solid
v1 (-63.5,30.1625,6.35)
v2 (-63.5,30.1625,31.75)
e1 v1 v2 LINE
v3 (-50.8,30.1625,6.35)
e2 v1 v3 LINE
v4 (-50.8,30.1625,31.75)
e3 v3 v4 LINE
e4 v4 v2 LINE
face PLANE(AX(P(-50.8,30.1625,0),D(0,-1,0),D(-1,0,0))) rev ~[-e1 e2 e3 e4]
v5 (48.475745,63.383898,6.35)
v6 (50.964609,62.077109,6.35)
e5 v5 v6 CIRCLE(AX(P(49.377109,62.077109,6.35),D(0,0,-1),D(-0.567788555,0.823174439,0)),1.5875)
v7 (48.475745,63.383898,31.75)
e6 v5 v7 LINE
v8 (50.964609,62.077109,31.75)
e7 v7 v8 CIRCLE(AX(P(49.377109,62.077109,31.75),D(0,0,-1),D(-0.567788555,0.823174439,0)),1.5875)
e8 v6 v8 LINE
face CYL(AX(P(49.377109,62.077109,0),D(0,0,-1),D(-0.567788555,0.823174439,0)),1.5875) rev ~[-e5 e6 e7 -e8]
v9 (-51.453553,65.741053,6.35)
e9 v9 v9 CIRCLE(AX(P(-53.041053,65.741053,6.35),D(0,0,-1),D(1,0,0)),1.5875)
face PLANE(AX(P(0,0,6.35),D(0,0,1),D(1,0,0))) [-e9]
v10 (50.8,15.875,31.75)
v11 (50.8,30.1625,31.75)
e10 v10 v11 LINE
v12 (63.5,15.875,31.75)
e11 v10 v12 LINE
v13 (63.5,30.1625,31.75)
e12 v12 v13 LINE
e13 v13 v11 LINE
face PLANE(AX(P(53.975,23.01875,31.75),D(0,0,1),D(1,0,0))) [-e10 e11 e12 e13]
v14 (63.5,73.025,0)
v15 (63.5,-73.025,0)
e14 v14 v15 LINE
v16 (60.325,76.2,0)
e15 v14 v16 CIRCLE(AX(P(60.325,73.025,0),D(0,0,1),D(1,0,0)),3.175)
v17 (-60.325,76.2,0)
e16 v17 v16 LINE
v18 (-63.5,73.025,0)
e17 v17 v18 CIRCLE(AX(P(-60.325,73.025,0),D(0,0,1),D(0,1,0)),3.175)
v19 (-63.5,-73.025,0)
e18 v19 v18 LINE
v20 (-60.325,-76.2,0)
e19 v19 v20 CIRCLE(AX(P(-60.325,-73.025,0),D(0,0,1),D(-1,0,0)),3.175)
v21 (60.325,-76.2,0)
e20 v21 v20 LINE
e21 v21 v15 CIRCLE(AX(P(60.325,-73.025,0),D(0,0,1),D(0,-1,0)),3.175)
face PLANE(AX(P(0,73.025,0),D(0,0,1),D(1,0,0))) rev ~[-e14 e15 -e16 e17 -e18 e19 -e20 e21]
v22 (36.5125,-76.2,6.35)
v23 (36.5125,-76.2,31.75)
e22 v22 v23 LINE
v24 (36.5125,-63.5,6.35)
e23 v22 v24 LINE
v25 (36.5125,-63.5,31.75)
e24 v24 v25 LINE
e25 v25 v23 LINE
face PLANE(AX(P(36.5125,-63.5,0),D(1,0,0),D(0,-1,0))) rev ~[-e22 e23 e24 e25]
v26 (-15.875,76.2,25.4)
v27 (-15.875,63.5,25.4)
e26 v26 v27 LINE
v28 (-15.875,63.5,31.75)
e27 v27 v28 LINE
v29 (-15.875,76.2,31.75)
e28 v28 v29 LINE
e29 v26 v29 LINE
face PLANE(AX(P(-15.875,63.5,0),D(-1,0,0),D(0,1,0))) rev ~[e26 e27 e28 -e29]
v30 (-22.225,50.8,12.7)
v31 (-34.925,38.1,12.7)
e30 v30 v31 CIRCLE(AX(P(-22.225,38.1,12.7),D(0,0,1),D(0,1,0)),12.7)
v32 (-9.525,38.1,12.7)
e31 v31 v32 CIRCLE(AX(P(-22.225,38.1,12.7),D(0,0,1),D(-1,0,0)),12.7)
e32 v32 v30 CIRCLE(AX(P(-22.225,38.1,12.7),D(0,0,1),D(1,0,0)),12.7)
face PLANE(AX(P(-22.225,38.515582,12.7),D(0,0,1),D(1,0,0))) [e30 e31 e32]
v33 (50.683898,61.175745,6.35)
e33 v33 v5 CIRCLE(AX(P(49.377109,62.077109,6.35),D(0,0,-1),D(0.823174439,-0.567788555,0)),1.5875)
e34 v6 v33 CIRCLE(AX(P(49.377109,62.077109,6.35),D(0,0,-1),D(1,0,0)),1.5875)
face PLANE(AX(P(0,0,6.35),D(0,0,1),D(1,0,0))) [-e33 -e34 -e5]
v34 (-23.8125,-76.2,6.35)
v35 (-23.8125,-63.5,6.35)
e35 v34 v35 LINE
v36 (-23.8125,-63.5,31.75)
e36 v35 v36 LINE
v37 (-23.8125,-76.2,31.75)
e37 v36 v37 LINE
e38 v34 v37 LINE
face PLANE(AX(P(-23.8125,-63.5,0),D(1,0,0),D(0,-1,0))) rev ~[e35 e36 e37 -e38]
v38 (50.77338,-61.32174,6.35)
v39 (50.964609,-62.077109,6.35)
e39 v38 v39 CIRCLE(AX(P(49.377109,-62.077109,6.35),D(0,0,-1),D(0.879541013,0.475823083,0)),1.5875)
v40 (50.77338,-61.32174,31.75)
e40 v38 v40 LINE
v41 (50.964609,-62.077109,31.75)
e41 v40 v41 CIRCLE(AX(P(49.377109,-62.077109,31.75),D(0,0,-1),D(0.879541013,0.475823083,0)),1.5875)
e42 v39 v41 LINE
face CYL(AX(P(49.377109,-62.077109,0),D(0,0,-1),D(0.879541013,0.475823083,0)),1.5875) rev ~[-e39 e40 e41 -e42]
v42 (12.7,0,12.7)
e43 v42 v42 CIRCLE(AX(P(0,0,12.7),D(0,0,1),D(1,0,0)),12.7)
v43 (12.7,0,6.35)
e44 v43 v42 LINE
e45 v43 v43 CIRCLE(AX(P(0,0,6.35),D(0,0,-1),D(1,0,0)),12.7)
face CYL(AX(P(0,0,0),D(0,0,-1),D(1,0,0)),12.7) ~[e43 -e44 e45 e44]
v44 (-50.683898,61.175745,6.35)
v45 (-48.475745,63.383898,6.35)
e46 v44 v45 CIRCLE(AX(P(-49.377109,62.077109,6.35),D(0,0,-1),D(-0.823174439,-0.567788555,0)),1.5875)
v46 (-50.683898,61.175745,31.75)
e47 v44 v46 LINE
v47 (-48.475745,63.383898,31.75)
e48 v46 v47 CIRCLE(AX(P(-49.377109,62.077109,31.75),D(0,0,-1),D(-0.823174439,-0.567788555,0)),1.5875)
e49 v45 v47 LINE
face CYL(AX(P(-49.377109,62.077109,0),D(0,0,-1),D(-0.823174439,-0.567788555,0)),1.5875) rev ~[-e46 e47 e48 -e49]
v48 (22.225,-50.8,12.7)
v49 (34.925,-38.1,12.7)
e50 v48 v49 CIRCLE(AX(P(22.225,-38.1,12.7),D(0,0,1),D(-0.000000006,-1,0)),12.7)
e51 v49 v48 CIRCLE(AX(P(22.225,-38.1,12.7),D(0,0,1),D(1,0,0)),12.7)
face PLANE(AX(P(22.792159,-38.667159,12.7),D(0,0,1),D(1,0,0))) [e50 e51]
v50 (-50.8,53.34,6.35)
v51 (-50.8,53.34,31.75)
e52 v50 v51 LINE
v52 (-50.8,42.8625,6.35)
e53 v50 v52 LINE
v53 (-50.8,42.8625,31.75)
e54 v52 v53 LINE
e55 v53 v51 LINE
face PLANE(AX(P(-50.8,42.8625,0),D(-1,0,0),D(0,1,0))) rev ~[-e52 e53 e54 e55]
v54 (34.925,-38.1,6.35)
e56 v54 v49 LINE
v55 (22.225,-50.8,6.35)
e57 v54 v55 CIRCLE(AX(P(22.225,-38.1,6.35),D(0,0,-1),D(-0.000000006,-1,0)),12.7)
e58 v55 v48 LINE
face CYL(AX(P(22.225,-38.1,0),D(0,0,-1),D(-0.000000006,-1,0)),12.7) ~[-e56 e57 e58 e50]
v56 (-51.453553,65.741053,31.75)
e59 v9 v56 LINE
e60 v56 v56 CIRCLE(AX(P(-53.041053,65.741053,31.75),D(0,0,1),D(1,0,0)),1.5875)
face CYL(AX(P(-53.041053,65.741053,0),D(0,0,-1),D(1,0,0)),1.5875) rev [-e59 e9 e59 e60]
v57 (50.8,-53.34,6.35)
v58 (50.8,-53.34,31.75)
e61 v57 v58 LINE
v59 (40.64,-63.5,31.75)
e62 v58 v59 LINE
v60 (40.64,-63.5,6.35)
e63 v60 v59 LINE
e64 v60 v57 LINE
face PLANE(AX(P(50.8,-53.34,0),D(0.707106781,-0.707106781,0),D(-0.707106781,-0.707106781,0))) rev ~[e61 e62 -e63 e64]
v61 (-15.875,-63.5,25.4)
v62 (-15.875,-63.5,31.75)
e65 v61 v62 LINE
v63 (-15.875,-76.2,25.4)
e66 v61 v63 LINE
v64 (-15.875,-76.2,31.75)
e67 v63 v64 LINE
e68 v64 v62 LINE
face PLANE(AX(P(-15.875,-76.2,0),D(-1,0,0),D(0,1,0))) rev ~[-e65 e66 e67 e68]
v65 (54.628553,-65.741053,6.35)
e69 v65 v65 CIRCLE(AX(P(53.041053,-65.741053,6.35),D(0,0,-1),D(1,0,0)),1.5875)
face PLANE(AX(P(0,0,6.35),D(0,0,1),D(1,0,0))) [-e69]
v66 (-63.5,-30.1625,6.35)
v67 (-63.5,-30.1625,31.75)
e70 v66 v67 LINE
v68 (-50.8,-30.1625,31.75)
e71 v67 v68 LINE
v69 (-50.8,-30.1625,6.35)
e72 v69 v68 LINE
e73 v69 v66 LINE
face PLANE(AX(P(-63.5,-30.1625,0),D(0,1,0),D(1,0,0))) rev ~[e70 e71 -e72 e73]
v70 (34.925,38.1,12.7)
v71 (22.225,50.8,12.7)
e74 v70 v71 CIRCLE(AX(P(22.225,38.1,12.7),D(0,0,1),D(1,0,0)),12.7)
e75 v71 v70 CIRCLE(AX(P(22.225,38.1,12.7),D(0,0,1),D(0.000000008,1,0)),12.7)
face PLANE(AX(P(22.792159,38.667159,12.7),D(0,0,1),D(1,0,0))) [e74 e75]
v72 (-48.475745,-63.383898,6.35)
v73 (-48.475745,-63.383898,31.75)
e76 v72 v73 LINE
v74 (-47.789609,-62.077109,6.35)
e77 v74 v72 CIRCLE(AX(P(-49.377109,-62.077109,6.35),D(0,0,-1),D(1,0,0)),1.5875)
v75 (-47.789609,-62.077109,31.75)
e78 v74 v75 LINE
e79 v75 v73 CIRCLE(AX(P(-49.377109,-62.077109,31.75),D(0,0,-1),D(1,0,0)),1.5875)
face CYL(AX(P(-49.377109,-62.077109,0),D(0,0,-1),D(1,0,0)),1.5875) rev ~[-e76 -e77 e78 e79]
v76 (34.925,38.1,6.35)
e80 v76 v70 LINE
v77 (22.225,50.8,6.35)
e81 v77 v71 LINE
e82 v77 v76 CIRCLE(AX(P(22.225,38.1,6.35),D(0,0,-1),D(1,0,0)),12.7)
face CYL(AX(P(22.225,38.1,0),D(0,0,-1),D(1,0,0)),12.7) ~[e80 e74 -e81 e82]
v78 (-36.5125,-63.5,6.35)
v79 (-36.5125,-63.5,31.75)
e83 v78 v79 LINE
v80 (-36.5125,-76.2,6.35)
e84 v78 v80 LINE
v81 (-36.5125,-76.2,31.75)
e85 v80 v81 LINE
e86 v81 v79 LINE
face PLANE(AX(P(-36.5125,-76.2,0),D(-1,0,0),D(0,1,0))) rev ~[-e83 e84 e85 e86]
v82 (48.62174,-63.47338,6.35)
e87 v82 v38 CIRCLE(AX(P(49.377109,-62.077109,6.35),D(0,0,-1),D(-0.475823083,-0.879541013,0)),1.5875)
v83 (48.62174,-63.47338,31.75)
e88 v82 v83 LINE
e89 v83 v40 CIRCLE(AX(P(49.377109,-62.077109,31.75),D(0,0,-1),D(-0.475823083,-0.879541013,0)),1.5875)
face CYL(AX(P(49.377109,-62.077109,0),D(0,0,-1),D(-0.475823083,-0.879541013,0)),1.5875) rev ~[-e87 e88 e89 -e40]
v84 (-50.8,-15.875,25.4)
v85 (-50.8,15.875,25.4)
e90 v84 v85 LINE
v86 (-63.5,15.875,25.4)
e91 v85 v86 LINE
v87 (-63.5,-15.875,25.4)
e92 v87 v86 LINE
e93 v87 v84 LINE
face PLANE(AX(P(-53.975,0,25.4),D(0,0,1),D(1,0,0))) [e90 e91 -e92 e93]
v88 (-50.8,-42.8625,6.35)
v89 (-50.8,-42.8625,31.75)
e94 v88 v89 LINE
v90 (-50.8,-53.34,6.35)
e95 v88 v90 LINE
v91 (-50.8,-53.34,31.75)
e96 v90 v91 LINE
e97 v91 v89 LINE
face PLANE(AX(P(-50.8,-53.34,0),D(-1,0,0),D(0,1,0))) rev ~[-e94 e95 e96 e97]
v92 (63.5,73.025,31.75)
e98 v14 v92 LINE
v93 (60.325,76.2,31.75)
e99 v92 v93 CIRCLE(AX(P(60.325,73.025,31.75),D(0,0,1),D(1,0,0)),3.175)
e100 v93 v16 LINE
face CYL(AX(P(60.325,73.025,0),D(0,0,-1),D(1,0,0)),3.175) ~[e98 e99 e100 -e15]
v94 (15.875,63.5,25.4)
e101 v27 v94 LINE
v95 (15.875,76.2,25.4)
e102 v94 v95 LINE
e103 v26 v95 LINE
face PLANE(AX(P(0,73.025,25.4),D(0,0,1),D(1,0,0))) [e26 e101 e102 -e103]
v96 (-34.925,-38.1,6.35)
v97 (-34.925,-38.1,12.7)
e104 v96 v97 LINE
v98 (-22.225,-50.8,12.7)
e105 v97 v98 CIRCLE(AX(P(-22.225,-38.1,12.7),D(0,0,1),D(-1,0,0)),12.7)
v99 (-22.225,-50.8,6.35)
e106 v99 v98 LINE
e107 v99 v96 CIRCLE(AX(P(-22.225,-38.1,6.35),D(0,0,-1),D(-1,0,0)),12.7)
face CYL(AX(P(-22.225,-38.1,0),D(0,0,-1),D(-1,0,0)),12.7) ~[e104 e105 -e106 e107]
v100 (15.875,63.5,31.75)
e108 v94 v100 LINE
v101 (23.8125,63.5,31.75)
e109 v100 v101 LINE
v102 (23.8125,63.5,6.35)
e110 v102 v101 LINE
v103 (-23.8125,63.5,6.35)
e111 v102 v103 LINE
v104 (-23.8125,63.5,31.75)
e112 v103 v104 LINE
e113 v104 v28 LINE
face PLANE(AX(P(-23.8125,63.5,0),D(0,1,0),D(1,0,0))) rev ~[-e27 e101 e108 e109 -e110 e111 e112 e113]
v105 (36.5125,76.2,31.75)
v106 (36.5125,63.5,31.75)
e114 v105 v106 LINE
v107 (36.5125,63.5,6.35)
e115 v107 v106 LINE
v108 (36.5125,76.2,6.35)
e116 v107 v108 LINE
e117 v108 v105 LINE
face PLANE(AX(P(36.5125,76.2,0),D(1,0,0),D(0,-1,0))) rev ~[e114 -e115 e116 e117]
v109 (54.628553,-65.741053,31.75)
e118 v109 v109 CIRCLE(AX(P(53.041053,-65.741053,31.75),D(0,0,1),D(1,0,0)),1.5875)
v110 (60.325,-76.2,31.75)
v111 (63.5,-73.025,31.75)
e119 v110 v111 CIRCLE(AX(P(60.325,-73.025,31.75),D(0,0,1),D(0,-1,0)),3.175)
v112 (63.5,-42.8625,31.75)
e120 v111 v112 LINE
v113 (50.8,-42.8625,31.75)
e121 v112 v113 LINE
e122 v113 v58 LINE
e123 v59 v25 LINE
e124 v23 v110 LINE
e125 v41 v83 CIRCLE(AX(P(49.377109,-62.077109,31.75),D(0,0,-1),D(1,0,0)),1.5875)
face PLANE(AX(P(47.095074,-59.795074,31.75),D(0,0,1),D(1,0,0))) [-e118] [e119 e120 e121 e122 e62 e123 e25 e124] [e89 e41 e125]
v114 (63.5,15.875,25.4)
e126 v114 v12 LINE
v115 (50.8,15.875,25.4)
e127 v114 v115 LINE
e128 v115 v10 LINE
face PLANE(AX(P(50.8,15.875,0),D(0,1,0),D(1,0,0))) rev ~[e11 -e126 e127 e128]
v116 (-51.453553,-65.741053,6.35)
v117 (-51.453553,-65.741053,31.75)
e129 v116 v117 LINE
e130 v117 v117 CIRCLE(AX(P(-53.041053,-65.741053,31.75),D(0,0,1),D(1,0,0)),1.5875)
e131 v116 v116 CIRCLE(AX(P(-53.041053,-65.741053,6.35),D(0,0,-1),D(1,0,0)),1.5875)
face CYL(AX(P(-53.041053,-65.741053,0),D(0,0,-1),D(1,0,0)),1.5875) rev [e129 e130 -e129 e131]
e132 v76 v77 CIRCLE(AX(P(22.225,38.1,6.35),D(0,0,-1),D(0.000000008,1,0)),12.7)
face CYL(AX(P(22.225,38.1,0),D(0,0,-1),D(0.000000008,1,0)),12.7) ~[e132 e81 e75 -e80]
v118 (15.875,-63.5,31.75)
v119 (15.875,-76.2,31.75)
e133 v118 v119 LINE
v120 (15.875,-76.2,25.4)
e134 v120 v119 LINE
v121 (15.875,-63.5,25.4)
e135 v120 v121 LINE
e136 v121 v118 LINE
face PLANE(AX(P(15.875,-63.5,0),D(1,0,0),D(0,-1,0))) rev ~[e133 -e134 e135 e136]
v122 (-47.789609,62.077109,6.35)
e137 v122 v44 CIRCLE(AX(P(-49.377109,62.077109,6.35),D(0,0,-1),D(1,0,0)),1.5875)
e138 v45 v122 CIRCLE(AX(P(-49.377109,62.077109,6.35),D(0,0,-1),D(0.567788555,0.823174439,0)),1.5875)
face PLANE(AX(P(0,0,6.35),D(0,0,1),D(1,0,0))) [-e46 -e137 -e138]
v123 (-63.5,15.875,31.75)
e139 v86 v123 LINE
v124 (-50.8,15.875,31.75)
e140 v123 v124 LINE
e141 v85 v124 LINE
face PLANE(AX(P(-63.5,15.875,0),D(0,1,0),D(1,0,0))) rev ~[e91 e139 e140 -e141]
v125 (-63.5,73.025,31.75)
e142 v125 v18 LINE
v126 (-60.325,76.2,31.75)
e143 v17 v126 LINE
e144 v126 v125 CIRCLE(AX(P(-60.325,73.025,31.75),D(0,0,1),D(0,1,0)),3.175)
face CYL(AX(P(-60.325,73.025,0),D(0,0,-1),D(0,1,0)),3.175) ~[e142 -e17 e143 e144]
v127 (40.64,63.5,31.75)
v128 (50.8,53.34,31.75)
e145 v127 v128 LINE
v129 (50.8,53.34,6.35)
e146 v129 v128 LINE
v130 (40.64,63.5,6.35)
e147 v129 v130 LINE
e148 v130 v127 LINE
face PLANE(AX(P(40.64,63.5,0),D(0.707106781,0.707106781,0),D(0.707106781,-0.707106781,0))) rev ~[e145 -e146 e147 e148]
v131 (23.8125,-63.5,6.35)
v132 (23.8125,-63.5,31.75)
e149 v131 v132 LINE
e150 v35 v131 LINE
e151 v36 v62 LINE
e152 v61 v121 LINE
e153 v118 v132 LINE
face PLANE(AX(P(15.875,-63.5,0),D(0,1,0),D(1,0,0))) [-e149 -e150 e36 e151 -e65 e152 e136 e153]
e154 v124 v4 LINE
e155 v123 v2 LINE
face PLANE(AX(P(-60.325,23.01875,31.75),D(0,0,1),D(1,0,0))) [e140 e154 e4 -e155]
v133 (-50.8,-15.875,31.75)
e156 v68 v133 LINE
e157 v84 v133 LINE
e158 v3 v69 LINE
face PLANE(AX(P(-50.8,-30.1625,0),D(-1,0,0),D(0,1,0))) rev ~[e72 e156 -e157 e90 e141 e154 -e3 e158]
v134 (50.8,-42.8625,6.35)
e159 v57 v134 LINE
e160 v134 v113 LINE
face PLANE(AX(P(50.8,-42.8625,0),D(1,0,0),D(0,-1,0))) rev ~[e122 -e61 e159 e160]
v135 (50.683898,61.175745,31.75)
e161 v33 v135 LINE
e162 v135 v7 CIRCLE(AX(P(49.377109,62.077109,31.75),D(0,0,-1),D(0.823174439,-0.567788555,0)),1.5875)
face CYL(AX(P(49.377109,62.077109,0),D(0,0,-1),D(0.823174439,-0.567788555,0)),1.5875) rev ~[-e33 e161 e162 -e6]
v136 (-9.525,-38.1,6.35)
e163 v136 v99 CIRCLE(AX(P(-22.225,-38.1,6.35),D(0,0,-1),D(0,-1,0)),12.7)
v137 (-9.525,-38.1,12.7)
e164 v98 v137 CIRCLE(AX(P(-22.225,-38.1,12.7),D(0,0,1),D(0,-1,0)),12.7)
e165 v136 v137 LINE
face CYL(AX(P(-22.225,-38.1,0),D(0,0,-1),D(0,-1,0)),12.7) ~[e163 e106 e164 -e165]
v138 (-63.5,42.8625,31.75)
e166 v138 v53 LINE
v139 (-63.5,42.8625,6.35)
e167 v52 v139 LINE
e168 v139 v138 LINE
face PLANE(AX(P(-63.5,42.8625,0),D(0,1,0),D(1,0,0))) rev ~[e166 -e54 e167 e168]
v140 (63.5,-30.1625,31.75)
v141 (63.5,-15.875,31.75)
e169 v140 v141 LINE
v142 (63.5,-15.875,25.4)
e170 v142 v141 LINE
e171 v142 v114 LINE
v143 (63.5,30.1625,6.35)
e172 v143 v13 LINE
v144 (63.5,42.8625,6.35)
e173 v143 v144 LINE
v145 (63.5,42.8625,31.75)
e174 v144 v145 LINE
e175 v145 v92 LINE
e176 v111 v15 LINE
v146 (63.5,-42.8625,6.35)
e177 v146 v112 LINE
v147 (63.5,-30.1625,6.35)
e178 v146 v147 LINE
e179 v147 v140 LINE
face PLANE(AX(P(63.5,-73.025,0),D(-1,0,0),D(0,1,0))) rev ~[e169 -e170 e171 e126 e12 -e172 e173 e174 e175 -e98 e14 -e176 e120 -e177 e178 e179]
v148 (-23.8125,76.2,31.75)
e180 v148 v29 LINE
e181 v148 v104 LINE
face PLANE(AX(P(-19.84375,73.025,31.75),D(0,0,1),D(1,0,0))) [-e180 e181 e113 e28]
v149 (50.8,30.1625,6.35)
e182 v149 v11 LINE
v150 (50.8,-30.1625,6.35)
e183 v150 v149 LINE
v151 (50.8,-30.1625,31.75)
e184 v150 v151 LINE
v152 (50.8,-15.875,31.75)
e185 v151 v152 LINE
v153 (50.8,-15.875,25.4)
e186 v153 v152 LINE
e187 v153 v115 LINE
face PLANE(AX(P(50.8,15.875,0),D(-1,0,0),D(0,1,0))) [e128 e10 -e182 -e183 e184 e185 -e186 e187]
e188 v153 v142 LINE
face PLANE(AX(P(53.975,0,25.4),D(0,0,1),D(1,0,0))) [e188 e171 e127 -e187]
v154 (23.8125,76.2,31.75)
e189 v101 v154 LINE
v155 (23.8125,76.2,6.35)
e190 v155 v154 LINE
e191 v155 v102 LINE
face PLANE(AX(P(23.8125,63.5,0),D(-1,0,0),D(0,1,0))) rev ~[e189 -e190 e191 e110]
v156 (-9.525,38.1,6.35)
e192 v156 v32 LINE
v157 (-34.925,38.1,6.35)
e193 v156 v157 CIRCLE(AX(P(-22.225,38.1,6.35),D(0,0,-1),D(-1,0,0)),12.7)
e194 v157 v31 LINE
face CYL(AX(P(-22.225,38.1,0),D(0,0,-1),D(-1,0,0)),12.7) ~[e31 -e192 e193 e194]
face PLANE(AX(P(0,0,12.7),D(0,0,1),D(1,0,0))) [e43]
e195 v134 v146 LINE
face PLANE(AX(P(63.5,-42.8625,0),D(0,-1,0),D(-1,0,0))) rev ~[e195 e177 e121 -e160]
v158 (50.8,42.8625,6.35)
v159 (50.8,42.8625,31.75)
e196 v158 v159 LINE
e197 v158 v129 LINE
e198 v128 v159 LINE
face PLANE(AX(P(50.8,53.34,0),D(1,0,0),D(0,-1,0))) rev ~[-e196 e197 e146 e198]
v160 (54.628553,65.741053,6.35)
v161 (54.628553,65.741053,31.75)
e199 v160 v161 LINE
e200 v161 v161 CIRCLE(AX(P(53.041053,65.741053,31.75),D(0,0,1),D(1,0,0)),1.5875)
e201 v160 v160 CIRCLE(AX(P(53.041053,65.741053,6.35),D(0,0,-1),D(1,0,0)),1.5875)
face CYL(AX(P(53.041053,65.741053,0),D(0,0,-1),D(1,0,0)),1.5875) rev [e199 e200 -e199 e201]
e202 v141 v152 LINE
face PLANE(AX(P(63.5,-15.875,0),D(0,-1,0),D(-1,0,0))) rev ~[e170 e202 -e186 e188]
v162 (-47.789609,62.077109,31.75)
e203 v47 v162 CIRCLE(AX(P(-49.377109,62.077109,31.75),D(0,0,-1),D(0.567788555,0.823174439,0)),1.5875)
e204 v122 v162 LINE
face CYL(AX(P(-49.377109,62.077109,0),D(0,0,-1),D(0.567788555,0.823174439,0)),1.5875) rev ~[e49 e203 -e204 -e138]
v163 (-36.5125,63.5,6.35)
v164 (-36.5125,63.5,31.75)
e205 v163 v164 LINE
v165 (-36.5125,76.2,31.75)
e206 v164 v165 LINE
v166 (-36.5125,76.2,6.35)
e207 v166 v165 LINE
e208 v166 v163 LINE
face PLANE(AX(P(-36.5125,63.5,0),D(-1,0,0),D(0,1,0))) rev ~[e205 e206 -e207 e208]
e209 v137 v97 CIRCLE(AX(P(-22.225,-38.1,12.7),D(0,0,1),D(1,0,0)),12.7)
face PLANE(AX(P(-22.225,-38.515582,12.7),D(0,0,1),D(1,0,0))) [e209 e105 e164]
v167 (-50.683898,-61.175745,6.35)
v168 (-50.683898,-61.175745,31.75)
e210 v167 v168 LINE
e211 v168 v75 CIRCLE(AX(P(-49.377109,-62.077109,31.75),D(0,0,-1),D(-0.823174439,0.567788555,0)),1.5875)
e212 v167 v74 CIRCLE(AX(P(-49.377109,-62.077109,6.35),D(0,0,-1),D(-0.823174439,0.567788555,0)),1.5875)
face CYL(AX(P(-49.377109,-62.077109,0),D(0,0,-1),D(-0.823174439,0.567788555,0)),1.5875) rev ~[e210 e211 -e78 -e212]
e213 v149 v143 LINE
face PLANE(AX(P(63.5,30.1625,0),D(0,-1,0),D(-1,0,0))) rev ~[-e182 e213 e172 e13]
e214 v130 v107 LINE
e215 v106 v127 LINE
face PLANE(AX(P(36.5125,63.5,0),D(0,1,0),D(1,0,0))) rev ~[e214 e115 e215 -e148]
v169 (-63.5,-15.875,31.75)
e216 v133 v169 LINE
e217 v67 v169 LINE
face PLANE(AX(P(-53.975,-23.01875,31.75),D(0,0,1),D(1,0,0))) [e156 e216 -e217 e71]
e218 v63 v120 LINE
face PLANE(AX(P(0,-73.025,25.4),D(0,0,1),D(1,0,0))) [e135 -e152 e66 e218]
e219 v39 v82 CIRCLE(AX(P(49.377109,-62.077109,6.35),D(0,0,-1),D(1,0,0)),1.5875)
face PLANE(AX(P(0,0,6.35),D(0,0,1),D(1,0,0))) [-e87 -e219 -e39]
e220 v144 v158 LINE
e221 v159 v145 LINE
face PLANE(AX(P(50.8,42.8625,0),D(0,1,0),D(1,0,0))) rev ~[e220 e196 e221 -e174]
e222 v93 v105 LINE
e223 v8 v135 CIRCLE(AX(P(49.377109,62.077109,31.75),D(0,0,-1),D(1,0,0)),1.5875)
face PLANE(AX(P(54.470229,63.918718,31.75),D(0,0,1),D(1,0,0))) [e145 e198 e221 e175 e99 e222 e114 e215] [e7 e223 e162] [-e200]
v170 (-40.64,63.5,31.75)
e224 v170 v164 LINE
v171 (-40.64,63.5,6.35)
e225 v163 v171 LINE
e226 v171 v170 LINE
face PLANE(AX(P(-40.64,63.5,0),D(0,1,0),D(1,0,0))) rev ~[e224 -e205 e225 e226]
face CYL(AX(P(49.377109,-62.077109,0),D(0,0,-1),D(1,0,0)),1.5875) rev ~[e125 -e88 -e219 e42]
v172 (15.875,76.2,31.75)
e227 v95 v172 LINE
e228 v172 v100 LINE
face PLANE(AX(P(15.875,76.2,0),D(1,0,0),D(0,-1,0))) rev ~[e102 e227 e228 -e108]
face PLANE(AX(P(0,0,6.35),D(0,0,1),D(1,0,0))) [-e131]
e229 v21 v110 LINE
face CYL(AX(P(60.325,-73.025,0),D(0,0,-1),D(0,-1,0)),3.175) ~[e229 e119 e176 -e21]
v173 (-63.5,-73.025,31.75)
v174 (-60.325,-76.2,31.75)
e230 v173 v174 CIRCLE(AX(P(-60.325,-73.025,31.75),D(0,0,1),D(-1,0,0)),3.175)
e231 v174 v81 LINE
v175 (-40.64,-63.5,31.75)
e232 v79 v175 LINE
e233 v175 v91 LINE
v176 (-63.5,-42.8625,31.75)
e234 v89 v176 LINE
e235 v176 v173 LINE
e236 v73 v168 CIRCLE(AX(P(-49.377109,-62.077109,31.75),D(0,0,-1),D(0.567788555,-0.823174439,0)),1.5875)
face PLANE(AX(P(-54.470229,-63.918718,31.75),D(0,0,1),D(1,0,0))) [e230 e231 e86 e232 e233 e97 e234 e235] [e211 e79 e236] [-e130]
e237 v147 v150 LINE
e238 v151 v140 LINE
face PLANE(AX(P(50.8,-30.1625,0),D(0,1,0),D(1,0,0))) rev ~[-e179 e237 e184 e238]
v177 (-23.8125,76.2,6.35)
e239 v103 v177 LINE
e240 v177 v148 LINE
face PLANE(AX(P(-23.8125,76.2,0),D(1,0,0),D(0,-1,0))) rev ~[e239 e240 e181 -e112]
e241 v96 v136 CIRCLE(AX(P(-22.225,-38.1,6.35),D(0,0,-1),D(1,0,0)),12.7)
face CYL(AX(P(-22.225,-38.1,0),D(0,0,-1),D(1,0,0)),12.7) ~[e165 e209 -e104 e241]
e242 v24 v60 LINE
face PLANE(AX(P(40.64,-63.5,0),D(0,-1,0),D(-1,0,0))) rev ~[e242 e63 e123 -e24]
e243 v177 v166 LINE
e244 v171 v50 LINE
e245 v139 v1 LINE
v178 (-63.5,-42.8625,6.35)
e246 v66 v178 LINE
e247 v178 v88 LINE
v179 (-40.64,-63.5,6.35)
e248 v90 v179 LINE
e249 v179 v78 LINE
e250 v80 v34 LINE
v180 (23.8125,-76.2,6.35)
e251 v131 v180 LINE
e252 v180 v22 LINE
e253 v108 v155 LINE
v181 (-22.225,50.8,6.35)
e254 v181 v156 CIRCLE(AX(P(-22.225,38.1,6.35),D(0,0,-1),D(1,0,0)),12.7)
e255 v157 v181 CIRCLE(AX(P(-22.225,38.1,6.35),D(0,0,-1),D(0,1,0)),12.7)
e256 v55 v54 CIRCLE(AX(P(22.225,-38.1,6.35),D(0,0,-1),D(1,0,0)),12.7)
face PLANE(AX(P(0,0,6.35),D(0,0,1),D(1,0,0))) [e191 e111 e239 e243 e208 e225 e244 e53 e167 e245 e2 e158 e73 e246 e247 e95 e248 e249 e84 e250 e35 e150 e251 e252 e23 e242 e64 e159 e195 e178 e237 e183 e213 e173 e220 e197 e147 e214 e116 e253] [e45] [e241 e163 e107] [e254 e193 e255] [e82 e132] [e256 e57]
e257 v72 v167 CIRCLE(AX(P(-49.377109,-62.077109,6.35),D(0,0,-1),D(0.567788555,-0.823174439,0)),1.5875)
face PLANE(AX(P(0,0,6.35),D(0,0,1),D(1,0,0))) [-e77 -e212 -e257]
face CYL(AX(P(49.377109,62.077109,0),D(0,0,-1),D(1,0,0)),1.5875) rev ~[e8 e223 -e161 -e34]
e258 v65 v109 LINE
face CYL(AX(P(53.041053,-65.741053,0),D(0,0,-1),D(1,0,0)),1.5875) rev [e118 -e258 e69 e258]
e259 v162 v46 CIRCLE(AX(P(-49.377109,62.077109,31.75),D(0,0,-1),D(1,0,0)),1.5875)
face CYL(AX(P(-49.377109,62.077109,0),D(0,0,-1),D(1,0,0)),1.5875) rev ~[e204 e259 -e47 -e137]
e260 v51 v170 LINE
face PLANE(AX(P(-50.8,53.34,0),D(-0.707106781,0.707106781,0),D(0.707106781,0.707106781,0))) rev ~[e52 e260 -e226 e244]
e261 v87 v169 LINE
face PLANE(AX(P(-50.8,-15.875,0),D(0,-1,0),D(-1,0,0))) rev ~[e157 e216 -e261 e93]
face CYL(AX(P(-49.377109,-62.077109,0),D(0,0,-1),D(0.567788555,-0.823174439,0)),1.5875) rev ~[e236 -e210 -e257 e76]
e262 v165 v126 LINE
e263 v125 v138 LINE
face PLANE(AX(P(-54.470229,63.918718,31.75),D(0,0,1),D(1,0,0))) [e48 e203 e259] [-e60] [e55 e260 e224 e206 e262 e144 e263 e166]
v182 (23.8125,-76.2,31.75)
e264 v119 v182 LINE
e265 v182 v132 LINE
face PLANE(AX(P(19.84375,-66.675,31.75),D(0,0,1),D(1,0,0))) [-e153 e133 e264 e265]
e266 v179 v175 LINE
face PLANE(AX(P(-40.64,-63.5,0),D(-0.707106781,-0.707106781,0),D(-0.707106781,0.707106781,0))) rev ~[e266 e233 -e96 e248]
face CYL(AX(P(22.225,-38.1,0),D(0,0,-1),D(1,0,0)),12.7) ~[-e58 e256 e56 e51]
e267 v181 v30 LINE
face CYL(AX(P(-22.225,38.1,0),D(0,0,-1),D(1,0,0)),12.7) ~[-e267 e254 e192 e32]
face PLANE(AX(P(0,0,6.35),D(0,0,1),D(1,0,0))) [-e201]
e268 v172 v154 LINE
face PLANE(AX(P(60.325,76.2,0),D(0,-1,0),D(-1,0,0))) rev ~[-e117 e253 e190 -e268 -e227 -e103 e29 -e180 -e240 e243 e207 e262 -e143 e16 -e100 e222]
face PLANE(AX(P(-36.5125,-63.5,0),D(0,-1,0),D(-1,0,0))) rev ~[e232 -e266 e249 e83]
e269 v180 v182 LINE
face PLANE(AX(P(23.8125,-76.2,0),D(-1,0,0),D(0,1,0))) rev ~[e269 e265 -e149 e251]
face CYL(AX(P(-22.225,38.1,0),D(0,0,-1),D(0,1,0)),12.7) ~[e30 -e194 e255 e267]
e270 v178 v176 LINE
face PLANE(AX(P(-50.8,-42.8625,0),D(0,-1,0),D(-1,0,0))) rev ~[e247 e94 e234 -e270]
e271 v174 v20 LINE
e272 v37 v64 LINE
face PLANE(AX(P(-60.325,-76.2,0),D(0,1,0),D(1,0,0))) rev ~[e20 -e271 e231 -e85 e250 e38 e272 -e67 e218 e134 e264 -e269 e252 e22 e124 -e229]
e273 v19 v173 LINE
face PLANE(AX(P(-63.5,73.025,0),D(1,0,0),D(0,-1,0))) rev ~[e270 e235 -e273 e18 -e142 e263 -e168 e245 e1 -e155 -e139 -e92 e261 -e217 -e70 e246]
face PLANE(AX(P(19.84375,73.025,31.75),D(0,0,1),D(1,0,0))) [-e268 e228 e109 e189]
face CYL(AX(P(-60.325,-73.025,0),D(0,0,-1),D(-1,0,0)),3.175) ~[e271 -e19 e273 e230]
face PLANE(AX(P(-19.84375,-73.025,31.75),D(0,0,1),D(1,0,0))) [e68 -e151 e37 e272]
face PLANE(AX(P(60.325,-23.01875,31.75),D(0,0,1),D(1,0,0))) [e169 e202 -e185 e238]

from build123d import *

# Parameters (mm, degrees)
F0_R     = 12.7
F0_R_2   = 1.5875
F0_W     = 6.35
F0_H     = 31.75
F0_W_2   = 31.75
F0_H_2   = 6.35
F0_H_3   = 14.2875
F0_H_4   = 12.7
F0_W_3   = 12.7
F0_W_4   = 7.9375
F1_DEPTH = 6.35
F2_DEPTH = 12.7
F3_DEPTH = 31.75
F4_DEPTH = 25.4


# Not quite as in the source:
# - a feature names something its author has since deleted; it is built from what else it names


with BuildPart() as f1:
    # F0 (on Top) → F1 (new body)
    with BuildSketch(Plane.XY):
        Polygon((-23.8125, 63.5), (-36.5125, 63.5), (-40.64, 63.5), (-50.8, 53.34), (-50.8, 42.8625), (-50.8, 30.1625), (-50.8, 15.875), (-50.8, -15.875), (-50.8, -30.1625), (-50.8, -42.8625), (-50.8, -53.34), (-40.64, -63.5), (-36.5125, -63.5), (-23.8125, -63.5), (-15.875, -63.5), (15.875, -63.5), (23.8125, -63.5), (36.5125, -63.5), (40.64, -63.5), (50.8, -53.34), (50.8, -42.8625), (50.8, -30.1625), (50.8, -15.875), (50.8, 15.875), (50.8, 30.1625), (50.8, 42.8625), (50.8, 53.34), (40.64, 63.5), (36.5125, 63.5), (23.8125, 63.5), (15.875, 63.5), (-15.875, 63.5), align=None)
        Polygon((-34.925, 38.1), (-34.925, 50.8), (-22.225, 50.8), (22.2250000973, 50.8), (34.925, 50.8), (34.925, 38.1), (34.925, -38.1), (34.925, -50.8), (22.2249999213, -50.8), (-22.225, -50.8), (-34.925, -50.8), (-34.925, -38.1), align=None, mode=Mode.SUBTRACT)
        with BuildLine():
            Line((22.2250000973, 50.8), (-22.225, 50.8))
            ThreePointArc((-22.225, 50.8), (-13.2447438789, 47.0802561211), (-9.525, 38.1))
            ThreePointArc((-9.525, 38.1), (-22.225, 25.4), (-34.925, 38.1))
            Line((-34.925, 38.1), (-34.925, -38.1))
            ThreePointArc((-34.925, -38.1), (-22.225, -25.4), (-9.525, -38.1))
            ThreePointArc((-9.525, -38.1), (-13.2447438789, -47.0802561211), (-22.225, -50.8))
            Line((-22.225, -50.8), (22.2249999213, -50.8))
            ThreePointArc((22.2249999213, -50.8), (13.2447439068, -29.1197438511), (34.925, -38.1))
            Line((34.925, -38.1), (34.925, 38.1))
            ThreePointArc((34.925, 38.1), (13.2447438445, 29.1197439133), (22.2250000973, 50.8))
        make_face()
        Circle(F0_R, mode=Mode.SUBTRACT)
        with BuildLine():
            ThreePointArc((34.925, 38.1), (31.2052561555, 47.0802560867), (22.2250000973, 50.8))
            ThreePointArc((22.2250000973, 50.8), (13.2447438445, 29.1197439133), (34.925, 38.1))
        make_face()
        Circle(F0_R)
        with BuildLine():
            ThreePointArc((-9.525, -38.1), (-22.225, -25.4), (-34.925, -38.1))
            ThreePointArc((-34.925, -38.1), (-31.2052561211, -47.0802561211), (-22.225, -50.8))
            ThreePointArc((-22.225, -50.8), (-13.2447438789, -47.0802561211), (-9.525, -38.1))
        make_face()
        with BuildLine():
            ThreePointArc((22.2249999213, -50.8), (31.2052560932, -47.0802561489), (34.925, -38.1))
            ThreePointArc((34.925, -38.1), (13.2447439068, -29.1197438511), (22.2249999213, -50.8))
        make_face()
        with BuildLine():
            ThreePointArc((-9.525, 38.1), (-13.2447438789, 47.0802561211), (-22.225, 50.8))
            ThreePointArc((-22.225, 50.8), (-31.2052561211, 47.0802561211), (-34.925, 38.1))
            ThreePointArc((-34.925, 38.1), (-22.225, 25.4), (-9.525, 38.1))
        make_face()
        with BuildLine():
            Line((-57.15, -42.8625), (-63.5, -42.8625))
            Line((-63.5, -42.8625), (-63.5, -73.025))
            ThreePointArc((-63.5, -73.025), (-62.5700640303, -75.2700640303), (-60.325, -76.2))
            Line((-60.325, -76.2), (-36.5125, -76.2))
            Line((-36.5125, -76.2), (-36.5125, -69.85))
            Line((-36.5125, -69.85), (-53.975, -69.85))
            ThreePointArc((-53.975, -69.85), (-56.2200640303, -68.9200640303), (-57.15, -66.675))
            Line((-57.15, -66.675), (-57.15, -42.8625))
        make_face()
        with BuildLine():
            Line((-36.5125, 76.2), (-60.325, 76.2))
            ThreePointArc((-60.325, 76.2), (-62.5700640303, 75.2700640303), (-63.5, 73.025))
            Line((-63.5, 73.025), (-63.5, 42.8625))
            Line((-63.5, 42.8625), (-57.15, 42.8625))
            Line((-57.15, 42.8625), (-57.15, 66.675))
            ThreePointArc((-57.15, 66.675), (-56.2200640303, 68.9200640303), (-53.975, 69.85))
            Line((-53.975, 69.85), (-36.5125, 69.85))
            Line((-36.5125, 69.85), (-36.5125, 76.2))
        make_face()
        with BuildLine():
            Line((60.325, 76.2), (36.5125, 76.2))
            Line((36.5125, 76.2), (36.5125, 69.85))
            Line((36.5125, 69.85), (53.975, 69.85))
            ThreePointArc((53.975, 69.85), (56.2200640303, 68.9200640303), (57.15, 66.675))
            Line((57.15, 66.675), (57.15, 42.8625))
            Line((57.15, 42.8625), (63.5, 42.8625))
            Line((63.5, 42.8625), (63.5, 73.025))
            ThreePointArc((63.5, 73.025), (62.5700640303, 75.2700640303), (60.325, 76.2))
        make_face()
        with BuildLine():
            Line((63.5, -73.025), (63.5, -42.8625))
            Line((63.5, -42.8625), (57.15, -42.8625))
            Line((57.15, -42.8625), (57.15, -66.675))
            ThreePointArc((57.15, -66.675), (56.2200640303, -68.9200640303), (53.975, -69.85))
            Line((53.975, -69.85), (36.5125, -69.85))
            Line((36.5125, -69.85), (36.5125, -76.2))
            Line((36.5125, -76.2), (60.325, -76.2))
            ThreePointArc((60.325, -76.2), (62.5700640303, -75.2700640303), (63.5, -73.025))
        make_face()
        with BuildLine():
            Line((-50.8, -42.8625), (-57.15, -42.8625))
            Line((-57.15, -42.8625), (-57.15, -66.675))
            ThreePointArc((-57.15, -66.675), (-56.2200640303, -68.9200640303), (-53.975, -69.85))
            Line((-53.975, -69.85), (-36.5125, -69.85))
            Line((-36.5125, -69.85), (-36.5125, -63.5))
            Line((-36.5125, -63.5), (-40.64, -63.5))
            Line((-40.64, -63.5), (-47.625, -63.5))
            ThreePointArc((-47.625, -63.5), (-48.054315115, -63.4708406718), (-48.4757445352, -63.3838982879))
            ThreePointArc((-48.4757445352, -63.3838982879), (-50.4996408811, -63.1996408811), (-50.6838982879, -61.1757445352))
            ThreePointArc((-50.6838982879, -61.1757445352), (-50.7708406718, -60.754315115), (-50.8, -60.325))
            Line((-50.8, -60.325), (-50.8, -53.34))
            Line((-50.8, -53.34), (-50.8, -42.8625))
        make_face()
        with Locations((-53.0410533634, -65.7410533634)):
            Circle(F0_R_2, mode=Mode.SUBTRACT)
        with BuildLine():
            Line((53.975, 69.85), (36.5125, 69.85))
            Line((36.5125, 69.85), (36.5125, 63.5))
            Line((36.5125, 63.5), (40.64, 63.5))
            Line((40.64, 63.5), (47.625, 63.5))
            ThreePointArc((47.625, 63.5), (48.054315115, 63.4708406718), (48.4757445352, 63.3838982879))
            ThreePointArc((48.4757445352, 63.3838982879), (50.1150927327, 63.4826465078), (50.964608866, 62.077108866))
            ThreePointArc((50.964608866, 62.077108866), (50.8928074603, 61.6050770648), (50.6838982879, 61.1757445352))
            ThreePointArc((50.6838982879, 61.1757445352), (50.7708406718, 60.754315115), (50.8, 60.325))
            Line((50.8, 60.325), (50.8, 53.34))
            Line((50.8, 53.34), (50.8, 42.8625))
            Line((50.8, 42.8625), (57.15, 42.8625))
            Line((57.15, 42.8625), (57.15, 66.675))
            ThreePointArc((57.15, 66.675), (56.2200640303, 68.9200640303), (53.975, 69.85))
        make_face()
        with Locations((53.0410533634, 65.7410533634)):
            Circle(F0_R_2, mode=Mode.SUBTRACT)
        with BuildLine():
            Line((-36.5125, 63.5), (-36.5125, 69.85))
            Line((-36.5125, 69.85), (-53.975, 69.85))
            ThreePointArc((-53.975, 69.85), (-56.2200640303, 68.9200640303), (-57.15, 66.675))
            Line((-57.15, 66.675), (-57.15, 42.8625))
            Line((-57.15, 42.8625), (-50.8, 42.8625))
            Line((-50.8, 42.8625), (-50.8, 53.34))
            Line((-50.8, 53.34), (-50.8, 60.325))
            ThreePointArc((-50.8, 60.325), (-50.7708406718, 60.754315115), (-50.6838982879, 61.1757445352))
            ThreePointArc((-50.6838982879, 61.1757445352), (-50.4996408811, 63.1996408811), (-48.4757445352, 63.3838982879))
            ThreePointArc((-48.4757445352, 63.3838982879), (-48.054315115, 63.4708406718), (-47.625, 63.5))
            Line((-47.625, 63.5), (-40.64, 63.5))
            Line((-40.64, 63.5), (-36.5125, 63.5))
        make_face()
        with Locations((-53.0410533634, 65.7410533634)):
            Circle(F0_R_2, mode=Mode.SUBTRACT)
        with BuildLine():
            Line((57.15, -66.675), (57.15, -42.8625))
            Line((57.15, -42.8625), (50.8, -42.8625))
            Line((50.8, -42.8625), (50.8, -53.34))
            Line((50.8, -53.34), (50.8, -60.9545768509))
            ThreePointArc((50.8, -60.9545768509), (50.7933363337, -61.1386401459), (50.7733802244, -61.3217397219))
            ThreePointArc((50.7733802244, -61.3217397219), (50.9160593252, -61.6875094123), (50.964608866, -62.077108866))
            ThreePointArc((50.964608866, -62.077108866), (50.1898227559, -63.4407995872), (48.6217397219, -63.4733802244))
            ThreePointArc((48.6217397219, -63.4733802244), (48.4386401459, -63.4933363337), (48.2545768509, -63.5))
            Line((48.2545768509, -63.5), (40.64, -63.5))
            Line((40.64, -63.5), (36.5125, -63.5))
            Line((36.5125, -63.5), (36.5125, -69.85))
            Line((36.5125, -69.85), (53.975, -69.85))
            ThreePointArc((53.975, -69.85), (56.2200640303, -68.9200640303), (57.15, -66.675))
        make_face()
        with Locations((53.0410533634, -65.7410533634)):
            Circle(F0_R_2, mode=Mode.SUBTRACT)
        with Locations((-60.325, 0)):
            Rectangle(F0_W, F0_H)
        with Locations((0, -73.025)):
            Rectangle(F0_W_2, F0_H_2)
        with Locations((0, 66.675)):
            Rectangle(F0_W_2, F0_H_2)
        with Locations((0, 73.025)):
            Rectangle(F0_W_2, F0_H_2)
        with Locations((-53.975, 0)):
            Rectangle(F0_W, F0_H)
        with Locations((53.975, 0)):
            Rectangle(F0_W, F0_H)
        with Locations((0, -66.675)):
            Rectangle(F0_W_2, F0_H_2)
        with Locations((60.325, 0)):
            Rectangle(F0_W, F0_H)
        with Locations((60.325, -23.01875)):
            Rectangle(F0_W, F0_H_3)
        with Locations((-53.975, -23.01875)):
            Rectangle(F0_W, F0_H_3)
        with Locations((-53.975, 23.01875)):
            Rectangle(F0_W, F0_H_3)
        with Locations((53.975, -23.01875)):
            Rectangle(F0_W, F0_H_3)
        with Locations((53.975, 23.01875)):
            Rectangle(F0_W, F0_H_3)
        with Locations((-60.325, -23.01875)):
            Rectangle(F0_W, F0_H_3)
        with Locations((60.325, 23.01875)):
            Rectangle(F0_W, F0_H_3)
        with Locations((-60.325, 23.01875)):
            Rectangle(F0_W, F0_H_3)
        with Locations((-60.325, -36.5125)):
            Rectangle(F0_W, F0_H_4)
        with Locations((53.975, 36.5125)):
            Rectangle(F0_W, F0_H_4)
        with Locations((30.1625, 73.025)):
            Rectangle(F0_W_3, F0_H_2)
        with Locations((60.325, -36.5125)):
            Rectangle(F0_W, F0_H_4)
        with Locations((60.325, 36.5125)):
            Rectangle(F0_W, F0_H_4)
        with Locations((-60.325, 36.5125)):
            Rectangle(F0_W, F0_H_4)
        with Locations((-30.1625, -73.025)):
            Rectangle(F0_W_3, F0_H_2)
        with Locations((30.1625, -66.675)):
            Rectangle(F0_W_3, F0_H_2)
        with Locations((30.1625, -73.025)):
            Rectangle(F0_W_3, F0_H_2)
        with Locations((-30.1625, 73.025)):
            Rectangle(F0_W_3, F0_H_2)
        with Locations((-30.1625, -66.675)):
            Rectangle(F0_W_3, F0_H_2)
        with Locations((-53.975, -36.5125)):
            Rectangle(F0_W, F0_H_4)
        with Locations((-53.975, 36.5125)):
            Rectangle(F0_W, F0_H_4)
        with Locations((-30.1625, 66.675)):
            Rectangle(F0_W_3, F0_H_2)
        with Locations((53.975, -36.5125)):
            Rectangle(F0_W, F0_H_4)
        with Locations((30.1625, 66.675)):
            Rectangle(F0_W_3, F0_H_2)
        with Locations((19.84375, -66.675)):
            Rectangle(F0_W_4, F0_H_2)
        with Locations((-19.84375, -66.675)):
            Rectangle(F0_W_4, F0_H_2)
        with Locations((19.84375, 73.025)):
            Rectangle(F0_W_4, F0_H_2)
        with Locations((-19.84375, 73.025)):
            Rectangle(F0_W_4, F0_H_2)
        with Locations((-19.84375, 66.675)):
            Rectangle(F0_W_4, F0_H_2)
        with Locations((-19.84375, -73.025)):
            Rectangle(F0_W_4, F0_H_2)
        with Locations((19.84375, -73.025)):
            Rectangle(F0_W_4, F0_H_2)
        with Locations((19.84375, 66.675)):
            Rectangle(F0_W_4, F0_H_2)
        with BuildLine():
            Line((50.8, -60.9545768509), (50.8, -53.34))
            Line((50.8, -53.34), (40.64, -63.5))
            Line((40.64, -63.5), (48.2545768509, -63.5))
            ThreePointArc((48.2545768509, -63.5), (48.4386401459, -63.4933363337), (48.6217397219, -63.4733802244))
            ThreePointArc((48.6217397219, -63.4733802244), (48.2545768509, -60.9545768509), (50.7733802244, -61.3217397219))
            ThreePointArc((50.7733802244, -61.3217397219), (50.7933363337, -61.1386401459), (50.8, -60.9545768509))
        make_face()
        with BuildLine():
            Line((-50.8, 53.34), (-40.64, 63.5))
            Line((-40.64, 63.5), (-47.625, 63.5))
            ThreePointArc((-47.625, 63.5), (-48.054315115, 63.4708406718), (-48.4757445352, 63.3838982879))
            ThreePointArc((-48.4757445352, 63.3838982879), (-47.9715712242, 62.8150927327), (-47.789608866, 62.077108866))
            ThreePointArc((-47.789608866, 62.077108866), (-48.9050770648, 60.5614102718), (-50.6838982879, 61.1757445352))
            ThreePointArc((-50.6838982879, 61.1757445352), (-50.7708406718, 60.754315115), (-50.8, 60.325))
            Line((-50.8, 60.325), (-50.8, 53.34))
        make_face()
        with BuildLine():
            Line((-40.64, -63.5), (-50.8, -53.34))
            Line((-50.8, -53.34), (-50.8, -60.325))
            ThreePointArc((-50.8, -60.325), (-50.7708406718, -60.754315115), (-50.6838982879, -61.1757445352))
            ThreePointArc((-50.6838982879, -61.1757445352), (-48.9050770648, -60.5614102718), (-47.789608866, -62.077108866))
            ThreePointArc((-47.789608866, -62.077108866), (-47.9715712242, -62.8150927327), (-48.4757445352, -63.3838982879))
            ThreePointArc((-48.4757445352, -63.3838982879), (-48.054315115, -63.4708406718), (-47.625, -63.5))
            Line((-47.625, -63.5), (-40.64, -63.5))
        make_face()
        with BuildLine():
            Line((47.625, 63.5), (40.64, 63.5))
            Line((40.64, 63.5), (50.8, 53.34))
            Line((50.8, 53.34), (50.8, 60.325))
            ThreePointArc((50.8, 60.325), (50.7708406718, 60.754315115), (50.6838982879, 61.1757445352))
            ThreePointArc((50.6838982879, 61.1757445352), (48.2545768509, 60.9545768509), (48.4757445352, 63.3838982879))
            ThreePointArc((48.4757445352, 63.3838982879), (48.054315115, 63.4708406718), (47.625, 63.5))
        make_face()
        with BuildLine():
            Line((34.925, 50.8), (22.2250000973, 50.8))
            ThreePointArc((22.2250000973, 50.8), (31.2052561555, 47.0802560867), (34.925, 38.1))
            Line((34.925, 38.1), (34.925, 50.8))
        make_face()
        with BuildLine():
            Line((34.925, -50.8), (34.925, -38.1))
            ThreePointArc((34.925, -38.1), (31.2052560932, -47.0802561489), (22.2249999213, -50.8))
            Line((22.2249999213, -50.8), (34.925, -50.8))
        make_face()
        with BuildLine():
            ThreePointArc((-22.225, -50.8), (-31.2052561211, -47.0802561211), (-34.925, -38.1))
            Line((-34.925, -38.1), (-34.925, -50.8))
            Line((-34.925, -50.8), (-22.225, -50.8))
        make_face()
        with BuildLine():
            Line((-22.225, 50.8), (-34.925, 50.8))
            Line((-34.925, 50.8), (-34.925, 38.1))
            ThreePointArc((-34.925, 38.1), (-31.2052561211, 47.0802561211), (-22.225, 50.8))
        make_face()
        with Locations((-53.0410533634, 65.7410533634)):
            Circle(F0_R_2)
        with Locations((53.0410533634, 65.7410533634)):
            Circle(F0_R_2)
        with Locations((53.0410533634, -65.7410533634)):
            Circle(F0_R_2)
        with Locations((-53.0410533634, -65.7410533634)):
            Circle(F0_R_2)
        with BuildLine():
            ThreePointArc((48.6217397219, -63.4733802244), (50.0544628206, -62.7544628206), (50.7733802244, -61.3217397219))
            ThreePointArc((50.7733802244, -61.3217397219), (48.2545768509, -60.9545768509), (48.6217397219, -63.4733802244))
        make_face()
        with BuildLine():
            ThreePointArc((-47.789608866, 62.077108866), (-47.9715712242, 62.8150927327), (-48.4757445352, 63.3838982879))
            ThreePointArc((-48.4757445352, 63.3838982879), (-49.8700640303, 62.5700640303), (-50.6838982879, 61.1757445352))
            ThreePointArc((-50.6838982879, 61.1757445352), (-48.9050770648, 60.5614102718), (-47.789608866, 62.077108866))
        make_face()
        with BuildLine():
            ThreePointArc((50.6838982879, 61.1757445352), (49.8700640303, 62.5700640303), (48.4757445352, 63.3838982879))
            ThreePointArc((48.4757445352, 63.3838982879), (48.2545768509, 60.9545768509), (50.6838982879, 61.1757445352))
        make_face()
        with BuildLine():
            ThreePointArc((-47.789608866, -62.077108866), (-48.9050770648, -60.5614102718), (-50.6838982879, -61.1757445352))
            ThreePointArc((-50.6838982879, -61.1757445352), (-49.8700640303, -62.5700640303), (-48.4757445352, -63.3838982879))
            ThreePointArc((-48.4757445352, -63.3838982879), (-47.9715712242, -62.8150927327), (-47.789608866, -62.077108866))
        make_face()
        with BuildLine():
            ThreePointArc((50.964608866, 62.077108866), (50.1150927327, 63.4826465078), (48.4757445352, 63.3838982879))
            ThreePointArc((48.4757445352, 63.3838982879), (49.8700640303, 62.5700640303), (50.6838982879, 61.1757445352))
            ThreePointArc((50.6838982879, 61.1757445352), (50.8928074603, 61.6050770648), (50.964608866, 62.077108866))
        make_face()
        with BuildLine():
            ThreePointArc((-50.6838982879, 61.1757445352), (-49.8700640303, 62.5700640303), (-48.4757445352, 63.3838982879))
            ThreePointArc((-48.4757445352, 63.3838982879), (-50.4996408811, 63.1996408811), (-50.6838982879, 61.1757445352))
        make_face()
        with BuildLine():
            ThreePointArc((-48.4757445352, -63.3838982879), (-49.8700640303, -62.5700640303), (-50.6838982879, -61.1757445352))
            ThreePointArc((-50.6838982879, -61.1757445352), (-50.4996408811, -63.1996408811), (-48.4757445352, -63.3838982879))
        make_face()
        with BuildLine():
            ThreePointArc((50.964608866, -62.077108866), (50.9160593252, -61.6875094123), (50.7733802244, -61.3217397219))
            ThreePointArc((50.7733802244, -61.3217397219), (50.0544628206, -62.7544628206), (48.6217397219, -63.4733802244))
            ThreePointArc((48.6217397219, -63.4733802244), (50.1898227559, -63.4407995872), (50.964608866, -62.077108866))
        make_face()
    extrude(amount=F1_DEPTH)

    # F0 (on Top) → F2 (join)
    with BuildSketch(Plane.XY):
        with BuildLine():
            ThreePointArc((-9.525, 38.1), (-13.2447438789, 47.0802561211), (-22.225, 50.8))
            ThreePointArc((-22.225, 50.8), (-31.2052561211, 47.0802561211), (-34.925, 38.1))
            ThreePointArc((-34.925, 38.1), (-22.225, 25.4), (-9.525, 38.1))
        make_face()
        with BuildLine():
            ThreePointArc((34.925, 38.1), (31.2052561555, 47.0802560867), (22.2250000973, 50.8))
            ThreePointArc((22.2250000973, 50.8), (13.2447438445, 29.1197439133), (34.925, 38.1))
        make_face()
        Circle(F0_R)
        with BuildLine():
            ThreePointArc((-9.525, -38.1), (-22.225, -25.4), (-34.925, -38.1))
            ThreePointArc((-34.925, -38.1), (-31.2052561211, -47.0802561211), (-22.225, -50.8))
            ThreePointArc((-22.225, -50.8), (-13.2447438789, -47.0802561211), (-9.525, -38.1))
        make_face()
        with BuildLine():
            ThreePointArc((22.2249999213, -50.8), (31.2052560932, -47.0802561489), (34.925, -38.1))
            ThreePointArc((34.925, -38.1), (13.2447439068, -29.1197438511), (22.2249999213, -50.8))
        make_face()
    extrude(amount=F2_DEPTH)

    # F0 (on Top) → F3 (join)
    with BuildSketch(Plane.XY):
        with BuildLine():
            Line((-36.5125, 76.2), (-60.325, 76.2))
            ThreePointArc((-60.325, 76.2), (-62.5700640303, 75.2700640303), (-63.5, 73.025))
            Line((-63.5, 73.025), (-63.5, 42.8625))
            Line((-63.5, 42.8625), (-57.15, 42.8625))
            Line((-57.15, 42.8625), (-57.15, 66.675))
            ThreePointArc((-57.15, 66.675), (-56.2200640303, 68.9200640303), (-53.975, 69.85))
            Line((-53.975, 69.85), (-36.5125, 69.85))
            Line((-36.5125, 69.85), (-36.5125, 76.2))
        make_face()
        with BuildLine():
            Line((-36.5125, 63.5), (-36.5125, 69.85))
            Line((-36.5125, 69.85), (-53.975, 69.85))
            ThreePointArc((-53.975, 69.85), (-56.2200640303, 68.9200640303), (-57.15, 66.675))
            Line((-57.15, 66.675), (-57.15, 42.8625))
            Line((-57.15, 42.8625), (-50.8, 42.8625))
            Line((-50.8, 42.8625), (-50.8, 53.34))
            Line((-50.8, 53.34), (-50.8, 60.325))
            ThreePointArc((-50.8, 60.325), (-50.7708406718, 60.754315115), (-50.6838982879, 61.1757445352))
            ThreePointArc((-50.6838982879, 61.1757445352), (-50.4996408811, 63.1996408811), (-48.4757445352, 63.3838982879))
            ThreePointArc((-48.4757445352, 63.3838982879), (-48.054315115, 63.4708406718), (-47.625, 63.5))
            Line((-47.625, 63.5), (-40.64, 63.5))
            Line((-40.64, 63.5), (-36.5125, 63.5))
        make_face()
        with Locations((-53.0410533634, 65.7410533634)):
            Circle(F0_R_2, mode=Mode.SUBTRACT)
        with Locations((-19.84375, 73.025)):
            Rectangle(F0_W_4, F0_H_2)
        with Locations((-19.84375, 66.675)):
            Rectangle(F0_W_4, F0_H_2)
        with BuildLine():
            Line((-50.8, 53.34), (-40.64, 63.5))
            Line((-40.64, 63.5), (-47.625, 63.5))
            ThreePointArc((-47.625, 63.5), (-48.054315115, 63.4708406718), (-48.4757445352, 63.3838982879))
            ThreePointArc((-48.4757445352, 63.3838982879), (-47.9715712242, 62.8150927327), (-47.789608866, 62.077108866))
            ThreePointArc((-47.789608866, 62.077108866), (-48.9050770648, 60.5614102718), (-50.6838982879, 61.1757445352))
            ThreePointArc((-50.6838982879, 61.1757445352), (-50.7708406718, 60.754315115), (-50.8, 60.325))
            Line((-50.8, 60.325), (-50.8, 53.34))
        make_face()
        with Locations((19.84375, 73.025)):
            Rectangle(F0_W_4, F0_H_2)
        with Locations((19.84375, 66.675)):
            Rectangle(F0_W_4, F0_H_2)
        with BuildLine():
            Line((60.325, 76.2), (36.5125, 76.2))
            Line((36.5125, 76.2), (36.5125, 69.85))
            Line((36.5125, 69.85), (53.975, 69.85))
            ThreePointArc((53.975, 69.85), (56.2200640303, 68.9200640303), (57.15, 66.675))
            Line((57.15, 66.675), (57.15, 42.8625))
            Line((57.15, 42.8625), (63.5, 42.8625))
            Line((63.5, 42.8625), (63.5, 73.025))
            ThreePointArc((63.5, 73.025), (62.5700640303, 75.2700640303), (60.325, 76.2))
        make_face()
        with BuildLine():
            Line((53.975, 69.85), (36.5125, 69.85))
            Line((36.5125, 69.85), (36.5125, 63.5))
            Line((36.5125, 63.5), (40.64, 63.5))
            Line((40.64, 63.5), (47.625, 63.5))
            ThreePointArc((47.625, 63.5), (48.054315115, 63.4708406718), (48.4757445352, 63.3838982879))
            ThreePointArc((48.4757445352, 63.3838982879), (50.1150927327, 63.4826465078), (50.964608866, 62.077108866))
            ThreePointArc((50.964608866, 62.077108866), (50.8928074603, 61.6050770648), (50.6838982879, 61.1757445352))
            ThreePointArc((50.6838982879, 61.1757445352), (50.7708406718, 60.754315115), (50.8, 60.325))
            Line((50.8, 60.325), (50.8, 53.34))
            Line((50.8, 53.34), (50.8, 42.8625))
            Line((50.8, 42.8625), (57.15, 42.8625))
            Line((57.15, 42.8625), (57.15, 66.675))
            ThreePointArc((57.15, 66.675), (56.2200640303, 68.9200640303), (53.975, 69.85))
        make_face()
        with Locations((53.0410533634, 65.7410533634)):
            Circle(F0_R_2, mode=Mode.SUBTRACT)
        with BuildLine():
            Line((47.625, 63.5), (40.64, 63.5))
            Line((40.64, 63.5), (50.8, 53.34))
            Line((50.8, 53.34), (50.8, 60.325))
            ThreePointArc((50.8, 60.325), (50.7708406718, 60.754315115), (50.6838982879, 61.1757445352))
            ThreePointArc((50.6838982879, 61.1757445352), (48.2545768509, 60.9545768509), (48.4757445352, 63.3838982879))
            ThreePointArc((48.4757445352, 63.3838982879), (48.054315115, 63.4708406718), (47.625, 63.5))
        make_face()
        with Locations((-60.325, 23.01875)):
            Rectangle(F0_W, F0_H_3)
        with Locations((-53.975, 23.01875)):
            Rectangle(F0_W, F0_H_3)
        with Locations((53.975, 23.01875)):
            Rectangle(F0_W, F0_H_3)
        with Locations((60.325, 23.01875)):
            Rectangle(F0_W, F0_H_3)
        with Locations((60.325, -23.01875)):
            Rectangle(F0_W, F0_H_3)
        with Locations((53.975, -23.01875)):
            Rectangle(F0_W, F0_H_3)
        with Locations((-53.975, -23.01875)):
            Rectangle(F0_W, F0_H_3)
        with Locations((-60.325, -23.01875)):
            Rectangle(F0_W, F0_H_3)
        with BuildLine():
            Line((-57.15, -42.8625), (-63.5, -42.8625))
            Line((-63.5, -42.8625), (-63.5, -73.025))
            ThreePointArc((-63.5, -73.025), (-62.5700640303, -75.2700640303), (-60.325, -76.2))
            Line((-60.325, -76.2), (-36.5125, -76.2))
            Line((-36.5125, -76.2), (-36.5125, -69.85))
            Line((-36.5125, -69.85), (-53.975, -69.85))
            ThreePointArc((-53.975, -69.85), (-56.2200640303, -68.9200640303), (-57.15, -66.675))
            Line((-57.15, -66.675), (-57.15, -42.8625))
        make_face()
        with BuildLine():
            Line((-50.8, -42.8625), (-57.15, -42.8625))
            Line((-57.15, -42.8625), (-57.15, -66.675))
            ThreePointArc((-57.15, -66.675), (-56.2200640303, -68.9200640303), (-53.975, -69.85))
            Line((-53.975, -69.85), (-36.5125, -69.85))
            Line((-36.5125, -69.85), (-36.5125, -63.5))
            Line((-36.5125, -63.5), (-40.64, -63.5))
            Line((-40.64, -63.5), (-47.625, -63.5))
            ThreePointArc((-47.625, -63.5), (-48.054315115, -63.4708406718), (-48.4757445352, -63.3838982879))
            ThreePointArc((-48.4757445352, -63.3838982879), (-50.4996408811, -63.1996408811), (-50.6838982879, -61.1757445352))
            ThreePointArc((-50.6838982879, -61.1757445352), (-50.7708406718, -60.754315115), (-50.8, -60.325))
            Line((-50.8, -60.325), (-50.8, -53.34))
            Line((-50.8, -53.34), (-50.8, -42.8625))
        make_face()
        with Locations((-53.0410533634, -65.7410533634)):
            Circle(F0_R_2, mode=Mode.SUBTRACT)
        with BuildLine():
            Line((-40.64, -63.5), (-50.8, -53.34))
            Line((-50.8, -53.34), (-50.8, -60.325))
            ThreePointArc((-50.8, -60.325), (-50.7708406718, -60.754315115), (-50.6838982879, -61.1757445352))
            ThreePointArc((-50.6838982879, -61.1757445352), (-48.9050770648, -60.5614102718), (-47.789608866, -62.077108866))
            ThreePointArc((-47.789608866, -62.077108866), (-47.9715712242, -62.8150927327), (-48.4757445352, -63.3838982879))
            ThreePointArc((-48.4757445352, -63.3838982879), (-48.054315115, -63.4708406718), (-47.625, -63.5))
            Line((-47.625, -63.5), (-40.64, -63.5))
        make_face()
        with BuildLine():
            Line((50.8, -60.9545768509), (50.8, -53.34))
            Line((50.8, -53.34), (40.64, -63.5))
            Line((40.64, -63.5), (48.2545768509, -63.5))
            ThreePointArc((48.2545768509, -63.5), (48.4386401459, -63.4933363337), (48.6217397219, -63.4733802244))
            ThreePointArc((48.6217397219, -63.4733802244), (48.2545768509, -60.9545768509), (50.7733802244, -61.3217397219))
            ThreePointArc((50.7733802244, -61.3217397219), (50.7933363337, -61.1386401459), (50.8, -60.9545768509))
        make_face()
        with BuildLine():
            Line((57.15, -66.675), (57.15, -42.8625))
            Line((57.15, -42.8625), (50.8, -42.8625))
            Line((50.8, -42.8625), (50.8, -53.34))
            Line((50.8, -53.34), (50.8, -60.9545768509))
            ThreePointArc((50.8, -60.9545768509), (50.7933363337, -61.1386401459), (50.7733802244, -61.3217397219))
            ThreePointArc((50.7733802244, -61.3217397219), (50.9160593252, -61.6875094123), (50.964608866, -62.077108866))
            ThreePointArc((50.964608866, -62.077108866), (50.1898227559, -63.4407995872), (48.6217397219, -63.4733802244))
            ThreePointArc((48.6217397219, -63.4733802244), (48.4386401459, -63.4933363337), (48.2545768509, -63.5))
            Line((48.2545768509, -63.5), (40.64, -63.5))
            Line((40.64, -63.5), (36.5125, -63.5))
            Line((36.5125, -63.5), (36.5125, -69.85))
            Line((36.5125, -69.85), (53.975, -69.85))
            ThreePointArc((53.975, -69.85), (56.2200640303, -68.9200640303), (57.15, -66.675))
        make_face()
        with Locations((53.0410533634, -65.7410533634)):
            Circle(F0_R_2, mode=Mode.SUBTRACT)
        with BuildLine():
            Line((63.5, -73.025), (63.5, -42.8625))
            Line((63.5, -42.8625), (57.15, -42.8625))
            Line((57.15, -42.8625), (57.15, -66.675))
            ThreePointArc((57.15, -66.675), (56.2200640303, -68.9200640303), (53.975, -69.85))
            Line((53.975, -69.85), (36.5125, -69.85))
            Line((36.5125, -69.85), (36.5125, -76.2))
            Line((36.5125, -76.2), (60.325, -76.2))
            ThreePointArc((60.325, -76.2), (62.5700640303, -75.2700640303), (63.5, -73.025))
        make_face()
        with Locations((19.84375, -66.675)):
            Rectangle(F0_W_4, F0_H_2)
        with Locations((19.84375, -73.025)):
            Rectangle(F0_W_4, F0_H_2)
        with Locations((-19.84375, -73.025)):
            Rectangle(F0_W_4, F0_H_2)
        with Locations((-19.84375, -66.675)):
            Rectangle(F0_W_4, F0_H_2)
    extrude(amount=F3_DEPTH)

    # F0 (on Top) → F4 (join)
    with BuildSketch(Plane.XY):
        with Locations((0, 73.025)):
            Rectangle(F0_W_2, F0_H_2)
        with Locations((0, 66.675)):
            Rectangle(F0_W_2, F0_H_2)
        with Locations((53.975, 0)):
            Rectangle(F0_W, F0_H)
        with Locations((60.325, 0)):
            Rectangle(F0_W, F0_H)
        with Locations((-53.975, 0)):
            Rectangle(F0_W, F0_H)
        with Locations((-60.325, 0)):
            Rectangle(F0_W, F0_H)
        with Locations((0, -73.025)):
            Rectangle(F0_W_2, F0_H_2)
        with Locations((0, -66.675)):
            Rectangle(F0_W_2, F0_H_2)
    extrude(amount=F4_DEPTH)


solid = f1.part
